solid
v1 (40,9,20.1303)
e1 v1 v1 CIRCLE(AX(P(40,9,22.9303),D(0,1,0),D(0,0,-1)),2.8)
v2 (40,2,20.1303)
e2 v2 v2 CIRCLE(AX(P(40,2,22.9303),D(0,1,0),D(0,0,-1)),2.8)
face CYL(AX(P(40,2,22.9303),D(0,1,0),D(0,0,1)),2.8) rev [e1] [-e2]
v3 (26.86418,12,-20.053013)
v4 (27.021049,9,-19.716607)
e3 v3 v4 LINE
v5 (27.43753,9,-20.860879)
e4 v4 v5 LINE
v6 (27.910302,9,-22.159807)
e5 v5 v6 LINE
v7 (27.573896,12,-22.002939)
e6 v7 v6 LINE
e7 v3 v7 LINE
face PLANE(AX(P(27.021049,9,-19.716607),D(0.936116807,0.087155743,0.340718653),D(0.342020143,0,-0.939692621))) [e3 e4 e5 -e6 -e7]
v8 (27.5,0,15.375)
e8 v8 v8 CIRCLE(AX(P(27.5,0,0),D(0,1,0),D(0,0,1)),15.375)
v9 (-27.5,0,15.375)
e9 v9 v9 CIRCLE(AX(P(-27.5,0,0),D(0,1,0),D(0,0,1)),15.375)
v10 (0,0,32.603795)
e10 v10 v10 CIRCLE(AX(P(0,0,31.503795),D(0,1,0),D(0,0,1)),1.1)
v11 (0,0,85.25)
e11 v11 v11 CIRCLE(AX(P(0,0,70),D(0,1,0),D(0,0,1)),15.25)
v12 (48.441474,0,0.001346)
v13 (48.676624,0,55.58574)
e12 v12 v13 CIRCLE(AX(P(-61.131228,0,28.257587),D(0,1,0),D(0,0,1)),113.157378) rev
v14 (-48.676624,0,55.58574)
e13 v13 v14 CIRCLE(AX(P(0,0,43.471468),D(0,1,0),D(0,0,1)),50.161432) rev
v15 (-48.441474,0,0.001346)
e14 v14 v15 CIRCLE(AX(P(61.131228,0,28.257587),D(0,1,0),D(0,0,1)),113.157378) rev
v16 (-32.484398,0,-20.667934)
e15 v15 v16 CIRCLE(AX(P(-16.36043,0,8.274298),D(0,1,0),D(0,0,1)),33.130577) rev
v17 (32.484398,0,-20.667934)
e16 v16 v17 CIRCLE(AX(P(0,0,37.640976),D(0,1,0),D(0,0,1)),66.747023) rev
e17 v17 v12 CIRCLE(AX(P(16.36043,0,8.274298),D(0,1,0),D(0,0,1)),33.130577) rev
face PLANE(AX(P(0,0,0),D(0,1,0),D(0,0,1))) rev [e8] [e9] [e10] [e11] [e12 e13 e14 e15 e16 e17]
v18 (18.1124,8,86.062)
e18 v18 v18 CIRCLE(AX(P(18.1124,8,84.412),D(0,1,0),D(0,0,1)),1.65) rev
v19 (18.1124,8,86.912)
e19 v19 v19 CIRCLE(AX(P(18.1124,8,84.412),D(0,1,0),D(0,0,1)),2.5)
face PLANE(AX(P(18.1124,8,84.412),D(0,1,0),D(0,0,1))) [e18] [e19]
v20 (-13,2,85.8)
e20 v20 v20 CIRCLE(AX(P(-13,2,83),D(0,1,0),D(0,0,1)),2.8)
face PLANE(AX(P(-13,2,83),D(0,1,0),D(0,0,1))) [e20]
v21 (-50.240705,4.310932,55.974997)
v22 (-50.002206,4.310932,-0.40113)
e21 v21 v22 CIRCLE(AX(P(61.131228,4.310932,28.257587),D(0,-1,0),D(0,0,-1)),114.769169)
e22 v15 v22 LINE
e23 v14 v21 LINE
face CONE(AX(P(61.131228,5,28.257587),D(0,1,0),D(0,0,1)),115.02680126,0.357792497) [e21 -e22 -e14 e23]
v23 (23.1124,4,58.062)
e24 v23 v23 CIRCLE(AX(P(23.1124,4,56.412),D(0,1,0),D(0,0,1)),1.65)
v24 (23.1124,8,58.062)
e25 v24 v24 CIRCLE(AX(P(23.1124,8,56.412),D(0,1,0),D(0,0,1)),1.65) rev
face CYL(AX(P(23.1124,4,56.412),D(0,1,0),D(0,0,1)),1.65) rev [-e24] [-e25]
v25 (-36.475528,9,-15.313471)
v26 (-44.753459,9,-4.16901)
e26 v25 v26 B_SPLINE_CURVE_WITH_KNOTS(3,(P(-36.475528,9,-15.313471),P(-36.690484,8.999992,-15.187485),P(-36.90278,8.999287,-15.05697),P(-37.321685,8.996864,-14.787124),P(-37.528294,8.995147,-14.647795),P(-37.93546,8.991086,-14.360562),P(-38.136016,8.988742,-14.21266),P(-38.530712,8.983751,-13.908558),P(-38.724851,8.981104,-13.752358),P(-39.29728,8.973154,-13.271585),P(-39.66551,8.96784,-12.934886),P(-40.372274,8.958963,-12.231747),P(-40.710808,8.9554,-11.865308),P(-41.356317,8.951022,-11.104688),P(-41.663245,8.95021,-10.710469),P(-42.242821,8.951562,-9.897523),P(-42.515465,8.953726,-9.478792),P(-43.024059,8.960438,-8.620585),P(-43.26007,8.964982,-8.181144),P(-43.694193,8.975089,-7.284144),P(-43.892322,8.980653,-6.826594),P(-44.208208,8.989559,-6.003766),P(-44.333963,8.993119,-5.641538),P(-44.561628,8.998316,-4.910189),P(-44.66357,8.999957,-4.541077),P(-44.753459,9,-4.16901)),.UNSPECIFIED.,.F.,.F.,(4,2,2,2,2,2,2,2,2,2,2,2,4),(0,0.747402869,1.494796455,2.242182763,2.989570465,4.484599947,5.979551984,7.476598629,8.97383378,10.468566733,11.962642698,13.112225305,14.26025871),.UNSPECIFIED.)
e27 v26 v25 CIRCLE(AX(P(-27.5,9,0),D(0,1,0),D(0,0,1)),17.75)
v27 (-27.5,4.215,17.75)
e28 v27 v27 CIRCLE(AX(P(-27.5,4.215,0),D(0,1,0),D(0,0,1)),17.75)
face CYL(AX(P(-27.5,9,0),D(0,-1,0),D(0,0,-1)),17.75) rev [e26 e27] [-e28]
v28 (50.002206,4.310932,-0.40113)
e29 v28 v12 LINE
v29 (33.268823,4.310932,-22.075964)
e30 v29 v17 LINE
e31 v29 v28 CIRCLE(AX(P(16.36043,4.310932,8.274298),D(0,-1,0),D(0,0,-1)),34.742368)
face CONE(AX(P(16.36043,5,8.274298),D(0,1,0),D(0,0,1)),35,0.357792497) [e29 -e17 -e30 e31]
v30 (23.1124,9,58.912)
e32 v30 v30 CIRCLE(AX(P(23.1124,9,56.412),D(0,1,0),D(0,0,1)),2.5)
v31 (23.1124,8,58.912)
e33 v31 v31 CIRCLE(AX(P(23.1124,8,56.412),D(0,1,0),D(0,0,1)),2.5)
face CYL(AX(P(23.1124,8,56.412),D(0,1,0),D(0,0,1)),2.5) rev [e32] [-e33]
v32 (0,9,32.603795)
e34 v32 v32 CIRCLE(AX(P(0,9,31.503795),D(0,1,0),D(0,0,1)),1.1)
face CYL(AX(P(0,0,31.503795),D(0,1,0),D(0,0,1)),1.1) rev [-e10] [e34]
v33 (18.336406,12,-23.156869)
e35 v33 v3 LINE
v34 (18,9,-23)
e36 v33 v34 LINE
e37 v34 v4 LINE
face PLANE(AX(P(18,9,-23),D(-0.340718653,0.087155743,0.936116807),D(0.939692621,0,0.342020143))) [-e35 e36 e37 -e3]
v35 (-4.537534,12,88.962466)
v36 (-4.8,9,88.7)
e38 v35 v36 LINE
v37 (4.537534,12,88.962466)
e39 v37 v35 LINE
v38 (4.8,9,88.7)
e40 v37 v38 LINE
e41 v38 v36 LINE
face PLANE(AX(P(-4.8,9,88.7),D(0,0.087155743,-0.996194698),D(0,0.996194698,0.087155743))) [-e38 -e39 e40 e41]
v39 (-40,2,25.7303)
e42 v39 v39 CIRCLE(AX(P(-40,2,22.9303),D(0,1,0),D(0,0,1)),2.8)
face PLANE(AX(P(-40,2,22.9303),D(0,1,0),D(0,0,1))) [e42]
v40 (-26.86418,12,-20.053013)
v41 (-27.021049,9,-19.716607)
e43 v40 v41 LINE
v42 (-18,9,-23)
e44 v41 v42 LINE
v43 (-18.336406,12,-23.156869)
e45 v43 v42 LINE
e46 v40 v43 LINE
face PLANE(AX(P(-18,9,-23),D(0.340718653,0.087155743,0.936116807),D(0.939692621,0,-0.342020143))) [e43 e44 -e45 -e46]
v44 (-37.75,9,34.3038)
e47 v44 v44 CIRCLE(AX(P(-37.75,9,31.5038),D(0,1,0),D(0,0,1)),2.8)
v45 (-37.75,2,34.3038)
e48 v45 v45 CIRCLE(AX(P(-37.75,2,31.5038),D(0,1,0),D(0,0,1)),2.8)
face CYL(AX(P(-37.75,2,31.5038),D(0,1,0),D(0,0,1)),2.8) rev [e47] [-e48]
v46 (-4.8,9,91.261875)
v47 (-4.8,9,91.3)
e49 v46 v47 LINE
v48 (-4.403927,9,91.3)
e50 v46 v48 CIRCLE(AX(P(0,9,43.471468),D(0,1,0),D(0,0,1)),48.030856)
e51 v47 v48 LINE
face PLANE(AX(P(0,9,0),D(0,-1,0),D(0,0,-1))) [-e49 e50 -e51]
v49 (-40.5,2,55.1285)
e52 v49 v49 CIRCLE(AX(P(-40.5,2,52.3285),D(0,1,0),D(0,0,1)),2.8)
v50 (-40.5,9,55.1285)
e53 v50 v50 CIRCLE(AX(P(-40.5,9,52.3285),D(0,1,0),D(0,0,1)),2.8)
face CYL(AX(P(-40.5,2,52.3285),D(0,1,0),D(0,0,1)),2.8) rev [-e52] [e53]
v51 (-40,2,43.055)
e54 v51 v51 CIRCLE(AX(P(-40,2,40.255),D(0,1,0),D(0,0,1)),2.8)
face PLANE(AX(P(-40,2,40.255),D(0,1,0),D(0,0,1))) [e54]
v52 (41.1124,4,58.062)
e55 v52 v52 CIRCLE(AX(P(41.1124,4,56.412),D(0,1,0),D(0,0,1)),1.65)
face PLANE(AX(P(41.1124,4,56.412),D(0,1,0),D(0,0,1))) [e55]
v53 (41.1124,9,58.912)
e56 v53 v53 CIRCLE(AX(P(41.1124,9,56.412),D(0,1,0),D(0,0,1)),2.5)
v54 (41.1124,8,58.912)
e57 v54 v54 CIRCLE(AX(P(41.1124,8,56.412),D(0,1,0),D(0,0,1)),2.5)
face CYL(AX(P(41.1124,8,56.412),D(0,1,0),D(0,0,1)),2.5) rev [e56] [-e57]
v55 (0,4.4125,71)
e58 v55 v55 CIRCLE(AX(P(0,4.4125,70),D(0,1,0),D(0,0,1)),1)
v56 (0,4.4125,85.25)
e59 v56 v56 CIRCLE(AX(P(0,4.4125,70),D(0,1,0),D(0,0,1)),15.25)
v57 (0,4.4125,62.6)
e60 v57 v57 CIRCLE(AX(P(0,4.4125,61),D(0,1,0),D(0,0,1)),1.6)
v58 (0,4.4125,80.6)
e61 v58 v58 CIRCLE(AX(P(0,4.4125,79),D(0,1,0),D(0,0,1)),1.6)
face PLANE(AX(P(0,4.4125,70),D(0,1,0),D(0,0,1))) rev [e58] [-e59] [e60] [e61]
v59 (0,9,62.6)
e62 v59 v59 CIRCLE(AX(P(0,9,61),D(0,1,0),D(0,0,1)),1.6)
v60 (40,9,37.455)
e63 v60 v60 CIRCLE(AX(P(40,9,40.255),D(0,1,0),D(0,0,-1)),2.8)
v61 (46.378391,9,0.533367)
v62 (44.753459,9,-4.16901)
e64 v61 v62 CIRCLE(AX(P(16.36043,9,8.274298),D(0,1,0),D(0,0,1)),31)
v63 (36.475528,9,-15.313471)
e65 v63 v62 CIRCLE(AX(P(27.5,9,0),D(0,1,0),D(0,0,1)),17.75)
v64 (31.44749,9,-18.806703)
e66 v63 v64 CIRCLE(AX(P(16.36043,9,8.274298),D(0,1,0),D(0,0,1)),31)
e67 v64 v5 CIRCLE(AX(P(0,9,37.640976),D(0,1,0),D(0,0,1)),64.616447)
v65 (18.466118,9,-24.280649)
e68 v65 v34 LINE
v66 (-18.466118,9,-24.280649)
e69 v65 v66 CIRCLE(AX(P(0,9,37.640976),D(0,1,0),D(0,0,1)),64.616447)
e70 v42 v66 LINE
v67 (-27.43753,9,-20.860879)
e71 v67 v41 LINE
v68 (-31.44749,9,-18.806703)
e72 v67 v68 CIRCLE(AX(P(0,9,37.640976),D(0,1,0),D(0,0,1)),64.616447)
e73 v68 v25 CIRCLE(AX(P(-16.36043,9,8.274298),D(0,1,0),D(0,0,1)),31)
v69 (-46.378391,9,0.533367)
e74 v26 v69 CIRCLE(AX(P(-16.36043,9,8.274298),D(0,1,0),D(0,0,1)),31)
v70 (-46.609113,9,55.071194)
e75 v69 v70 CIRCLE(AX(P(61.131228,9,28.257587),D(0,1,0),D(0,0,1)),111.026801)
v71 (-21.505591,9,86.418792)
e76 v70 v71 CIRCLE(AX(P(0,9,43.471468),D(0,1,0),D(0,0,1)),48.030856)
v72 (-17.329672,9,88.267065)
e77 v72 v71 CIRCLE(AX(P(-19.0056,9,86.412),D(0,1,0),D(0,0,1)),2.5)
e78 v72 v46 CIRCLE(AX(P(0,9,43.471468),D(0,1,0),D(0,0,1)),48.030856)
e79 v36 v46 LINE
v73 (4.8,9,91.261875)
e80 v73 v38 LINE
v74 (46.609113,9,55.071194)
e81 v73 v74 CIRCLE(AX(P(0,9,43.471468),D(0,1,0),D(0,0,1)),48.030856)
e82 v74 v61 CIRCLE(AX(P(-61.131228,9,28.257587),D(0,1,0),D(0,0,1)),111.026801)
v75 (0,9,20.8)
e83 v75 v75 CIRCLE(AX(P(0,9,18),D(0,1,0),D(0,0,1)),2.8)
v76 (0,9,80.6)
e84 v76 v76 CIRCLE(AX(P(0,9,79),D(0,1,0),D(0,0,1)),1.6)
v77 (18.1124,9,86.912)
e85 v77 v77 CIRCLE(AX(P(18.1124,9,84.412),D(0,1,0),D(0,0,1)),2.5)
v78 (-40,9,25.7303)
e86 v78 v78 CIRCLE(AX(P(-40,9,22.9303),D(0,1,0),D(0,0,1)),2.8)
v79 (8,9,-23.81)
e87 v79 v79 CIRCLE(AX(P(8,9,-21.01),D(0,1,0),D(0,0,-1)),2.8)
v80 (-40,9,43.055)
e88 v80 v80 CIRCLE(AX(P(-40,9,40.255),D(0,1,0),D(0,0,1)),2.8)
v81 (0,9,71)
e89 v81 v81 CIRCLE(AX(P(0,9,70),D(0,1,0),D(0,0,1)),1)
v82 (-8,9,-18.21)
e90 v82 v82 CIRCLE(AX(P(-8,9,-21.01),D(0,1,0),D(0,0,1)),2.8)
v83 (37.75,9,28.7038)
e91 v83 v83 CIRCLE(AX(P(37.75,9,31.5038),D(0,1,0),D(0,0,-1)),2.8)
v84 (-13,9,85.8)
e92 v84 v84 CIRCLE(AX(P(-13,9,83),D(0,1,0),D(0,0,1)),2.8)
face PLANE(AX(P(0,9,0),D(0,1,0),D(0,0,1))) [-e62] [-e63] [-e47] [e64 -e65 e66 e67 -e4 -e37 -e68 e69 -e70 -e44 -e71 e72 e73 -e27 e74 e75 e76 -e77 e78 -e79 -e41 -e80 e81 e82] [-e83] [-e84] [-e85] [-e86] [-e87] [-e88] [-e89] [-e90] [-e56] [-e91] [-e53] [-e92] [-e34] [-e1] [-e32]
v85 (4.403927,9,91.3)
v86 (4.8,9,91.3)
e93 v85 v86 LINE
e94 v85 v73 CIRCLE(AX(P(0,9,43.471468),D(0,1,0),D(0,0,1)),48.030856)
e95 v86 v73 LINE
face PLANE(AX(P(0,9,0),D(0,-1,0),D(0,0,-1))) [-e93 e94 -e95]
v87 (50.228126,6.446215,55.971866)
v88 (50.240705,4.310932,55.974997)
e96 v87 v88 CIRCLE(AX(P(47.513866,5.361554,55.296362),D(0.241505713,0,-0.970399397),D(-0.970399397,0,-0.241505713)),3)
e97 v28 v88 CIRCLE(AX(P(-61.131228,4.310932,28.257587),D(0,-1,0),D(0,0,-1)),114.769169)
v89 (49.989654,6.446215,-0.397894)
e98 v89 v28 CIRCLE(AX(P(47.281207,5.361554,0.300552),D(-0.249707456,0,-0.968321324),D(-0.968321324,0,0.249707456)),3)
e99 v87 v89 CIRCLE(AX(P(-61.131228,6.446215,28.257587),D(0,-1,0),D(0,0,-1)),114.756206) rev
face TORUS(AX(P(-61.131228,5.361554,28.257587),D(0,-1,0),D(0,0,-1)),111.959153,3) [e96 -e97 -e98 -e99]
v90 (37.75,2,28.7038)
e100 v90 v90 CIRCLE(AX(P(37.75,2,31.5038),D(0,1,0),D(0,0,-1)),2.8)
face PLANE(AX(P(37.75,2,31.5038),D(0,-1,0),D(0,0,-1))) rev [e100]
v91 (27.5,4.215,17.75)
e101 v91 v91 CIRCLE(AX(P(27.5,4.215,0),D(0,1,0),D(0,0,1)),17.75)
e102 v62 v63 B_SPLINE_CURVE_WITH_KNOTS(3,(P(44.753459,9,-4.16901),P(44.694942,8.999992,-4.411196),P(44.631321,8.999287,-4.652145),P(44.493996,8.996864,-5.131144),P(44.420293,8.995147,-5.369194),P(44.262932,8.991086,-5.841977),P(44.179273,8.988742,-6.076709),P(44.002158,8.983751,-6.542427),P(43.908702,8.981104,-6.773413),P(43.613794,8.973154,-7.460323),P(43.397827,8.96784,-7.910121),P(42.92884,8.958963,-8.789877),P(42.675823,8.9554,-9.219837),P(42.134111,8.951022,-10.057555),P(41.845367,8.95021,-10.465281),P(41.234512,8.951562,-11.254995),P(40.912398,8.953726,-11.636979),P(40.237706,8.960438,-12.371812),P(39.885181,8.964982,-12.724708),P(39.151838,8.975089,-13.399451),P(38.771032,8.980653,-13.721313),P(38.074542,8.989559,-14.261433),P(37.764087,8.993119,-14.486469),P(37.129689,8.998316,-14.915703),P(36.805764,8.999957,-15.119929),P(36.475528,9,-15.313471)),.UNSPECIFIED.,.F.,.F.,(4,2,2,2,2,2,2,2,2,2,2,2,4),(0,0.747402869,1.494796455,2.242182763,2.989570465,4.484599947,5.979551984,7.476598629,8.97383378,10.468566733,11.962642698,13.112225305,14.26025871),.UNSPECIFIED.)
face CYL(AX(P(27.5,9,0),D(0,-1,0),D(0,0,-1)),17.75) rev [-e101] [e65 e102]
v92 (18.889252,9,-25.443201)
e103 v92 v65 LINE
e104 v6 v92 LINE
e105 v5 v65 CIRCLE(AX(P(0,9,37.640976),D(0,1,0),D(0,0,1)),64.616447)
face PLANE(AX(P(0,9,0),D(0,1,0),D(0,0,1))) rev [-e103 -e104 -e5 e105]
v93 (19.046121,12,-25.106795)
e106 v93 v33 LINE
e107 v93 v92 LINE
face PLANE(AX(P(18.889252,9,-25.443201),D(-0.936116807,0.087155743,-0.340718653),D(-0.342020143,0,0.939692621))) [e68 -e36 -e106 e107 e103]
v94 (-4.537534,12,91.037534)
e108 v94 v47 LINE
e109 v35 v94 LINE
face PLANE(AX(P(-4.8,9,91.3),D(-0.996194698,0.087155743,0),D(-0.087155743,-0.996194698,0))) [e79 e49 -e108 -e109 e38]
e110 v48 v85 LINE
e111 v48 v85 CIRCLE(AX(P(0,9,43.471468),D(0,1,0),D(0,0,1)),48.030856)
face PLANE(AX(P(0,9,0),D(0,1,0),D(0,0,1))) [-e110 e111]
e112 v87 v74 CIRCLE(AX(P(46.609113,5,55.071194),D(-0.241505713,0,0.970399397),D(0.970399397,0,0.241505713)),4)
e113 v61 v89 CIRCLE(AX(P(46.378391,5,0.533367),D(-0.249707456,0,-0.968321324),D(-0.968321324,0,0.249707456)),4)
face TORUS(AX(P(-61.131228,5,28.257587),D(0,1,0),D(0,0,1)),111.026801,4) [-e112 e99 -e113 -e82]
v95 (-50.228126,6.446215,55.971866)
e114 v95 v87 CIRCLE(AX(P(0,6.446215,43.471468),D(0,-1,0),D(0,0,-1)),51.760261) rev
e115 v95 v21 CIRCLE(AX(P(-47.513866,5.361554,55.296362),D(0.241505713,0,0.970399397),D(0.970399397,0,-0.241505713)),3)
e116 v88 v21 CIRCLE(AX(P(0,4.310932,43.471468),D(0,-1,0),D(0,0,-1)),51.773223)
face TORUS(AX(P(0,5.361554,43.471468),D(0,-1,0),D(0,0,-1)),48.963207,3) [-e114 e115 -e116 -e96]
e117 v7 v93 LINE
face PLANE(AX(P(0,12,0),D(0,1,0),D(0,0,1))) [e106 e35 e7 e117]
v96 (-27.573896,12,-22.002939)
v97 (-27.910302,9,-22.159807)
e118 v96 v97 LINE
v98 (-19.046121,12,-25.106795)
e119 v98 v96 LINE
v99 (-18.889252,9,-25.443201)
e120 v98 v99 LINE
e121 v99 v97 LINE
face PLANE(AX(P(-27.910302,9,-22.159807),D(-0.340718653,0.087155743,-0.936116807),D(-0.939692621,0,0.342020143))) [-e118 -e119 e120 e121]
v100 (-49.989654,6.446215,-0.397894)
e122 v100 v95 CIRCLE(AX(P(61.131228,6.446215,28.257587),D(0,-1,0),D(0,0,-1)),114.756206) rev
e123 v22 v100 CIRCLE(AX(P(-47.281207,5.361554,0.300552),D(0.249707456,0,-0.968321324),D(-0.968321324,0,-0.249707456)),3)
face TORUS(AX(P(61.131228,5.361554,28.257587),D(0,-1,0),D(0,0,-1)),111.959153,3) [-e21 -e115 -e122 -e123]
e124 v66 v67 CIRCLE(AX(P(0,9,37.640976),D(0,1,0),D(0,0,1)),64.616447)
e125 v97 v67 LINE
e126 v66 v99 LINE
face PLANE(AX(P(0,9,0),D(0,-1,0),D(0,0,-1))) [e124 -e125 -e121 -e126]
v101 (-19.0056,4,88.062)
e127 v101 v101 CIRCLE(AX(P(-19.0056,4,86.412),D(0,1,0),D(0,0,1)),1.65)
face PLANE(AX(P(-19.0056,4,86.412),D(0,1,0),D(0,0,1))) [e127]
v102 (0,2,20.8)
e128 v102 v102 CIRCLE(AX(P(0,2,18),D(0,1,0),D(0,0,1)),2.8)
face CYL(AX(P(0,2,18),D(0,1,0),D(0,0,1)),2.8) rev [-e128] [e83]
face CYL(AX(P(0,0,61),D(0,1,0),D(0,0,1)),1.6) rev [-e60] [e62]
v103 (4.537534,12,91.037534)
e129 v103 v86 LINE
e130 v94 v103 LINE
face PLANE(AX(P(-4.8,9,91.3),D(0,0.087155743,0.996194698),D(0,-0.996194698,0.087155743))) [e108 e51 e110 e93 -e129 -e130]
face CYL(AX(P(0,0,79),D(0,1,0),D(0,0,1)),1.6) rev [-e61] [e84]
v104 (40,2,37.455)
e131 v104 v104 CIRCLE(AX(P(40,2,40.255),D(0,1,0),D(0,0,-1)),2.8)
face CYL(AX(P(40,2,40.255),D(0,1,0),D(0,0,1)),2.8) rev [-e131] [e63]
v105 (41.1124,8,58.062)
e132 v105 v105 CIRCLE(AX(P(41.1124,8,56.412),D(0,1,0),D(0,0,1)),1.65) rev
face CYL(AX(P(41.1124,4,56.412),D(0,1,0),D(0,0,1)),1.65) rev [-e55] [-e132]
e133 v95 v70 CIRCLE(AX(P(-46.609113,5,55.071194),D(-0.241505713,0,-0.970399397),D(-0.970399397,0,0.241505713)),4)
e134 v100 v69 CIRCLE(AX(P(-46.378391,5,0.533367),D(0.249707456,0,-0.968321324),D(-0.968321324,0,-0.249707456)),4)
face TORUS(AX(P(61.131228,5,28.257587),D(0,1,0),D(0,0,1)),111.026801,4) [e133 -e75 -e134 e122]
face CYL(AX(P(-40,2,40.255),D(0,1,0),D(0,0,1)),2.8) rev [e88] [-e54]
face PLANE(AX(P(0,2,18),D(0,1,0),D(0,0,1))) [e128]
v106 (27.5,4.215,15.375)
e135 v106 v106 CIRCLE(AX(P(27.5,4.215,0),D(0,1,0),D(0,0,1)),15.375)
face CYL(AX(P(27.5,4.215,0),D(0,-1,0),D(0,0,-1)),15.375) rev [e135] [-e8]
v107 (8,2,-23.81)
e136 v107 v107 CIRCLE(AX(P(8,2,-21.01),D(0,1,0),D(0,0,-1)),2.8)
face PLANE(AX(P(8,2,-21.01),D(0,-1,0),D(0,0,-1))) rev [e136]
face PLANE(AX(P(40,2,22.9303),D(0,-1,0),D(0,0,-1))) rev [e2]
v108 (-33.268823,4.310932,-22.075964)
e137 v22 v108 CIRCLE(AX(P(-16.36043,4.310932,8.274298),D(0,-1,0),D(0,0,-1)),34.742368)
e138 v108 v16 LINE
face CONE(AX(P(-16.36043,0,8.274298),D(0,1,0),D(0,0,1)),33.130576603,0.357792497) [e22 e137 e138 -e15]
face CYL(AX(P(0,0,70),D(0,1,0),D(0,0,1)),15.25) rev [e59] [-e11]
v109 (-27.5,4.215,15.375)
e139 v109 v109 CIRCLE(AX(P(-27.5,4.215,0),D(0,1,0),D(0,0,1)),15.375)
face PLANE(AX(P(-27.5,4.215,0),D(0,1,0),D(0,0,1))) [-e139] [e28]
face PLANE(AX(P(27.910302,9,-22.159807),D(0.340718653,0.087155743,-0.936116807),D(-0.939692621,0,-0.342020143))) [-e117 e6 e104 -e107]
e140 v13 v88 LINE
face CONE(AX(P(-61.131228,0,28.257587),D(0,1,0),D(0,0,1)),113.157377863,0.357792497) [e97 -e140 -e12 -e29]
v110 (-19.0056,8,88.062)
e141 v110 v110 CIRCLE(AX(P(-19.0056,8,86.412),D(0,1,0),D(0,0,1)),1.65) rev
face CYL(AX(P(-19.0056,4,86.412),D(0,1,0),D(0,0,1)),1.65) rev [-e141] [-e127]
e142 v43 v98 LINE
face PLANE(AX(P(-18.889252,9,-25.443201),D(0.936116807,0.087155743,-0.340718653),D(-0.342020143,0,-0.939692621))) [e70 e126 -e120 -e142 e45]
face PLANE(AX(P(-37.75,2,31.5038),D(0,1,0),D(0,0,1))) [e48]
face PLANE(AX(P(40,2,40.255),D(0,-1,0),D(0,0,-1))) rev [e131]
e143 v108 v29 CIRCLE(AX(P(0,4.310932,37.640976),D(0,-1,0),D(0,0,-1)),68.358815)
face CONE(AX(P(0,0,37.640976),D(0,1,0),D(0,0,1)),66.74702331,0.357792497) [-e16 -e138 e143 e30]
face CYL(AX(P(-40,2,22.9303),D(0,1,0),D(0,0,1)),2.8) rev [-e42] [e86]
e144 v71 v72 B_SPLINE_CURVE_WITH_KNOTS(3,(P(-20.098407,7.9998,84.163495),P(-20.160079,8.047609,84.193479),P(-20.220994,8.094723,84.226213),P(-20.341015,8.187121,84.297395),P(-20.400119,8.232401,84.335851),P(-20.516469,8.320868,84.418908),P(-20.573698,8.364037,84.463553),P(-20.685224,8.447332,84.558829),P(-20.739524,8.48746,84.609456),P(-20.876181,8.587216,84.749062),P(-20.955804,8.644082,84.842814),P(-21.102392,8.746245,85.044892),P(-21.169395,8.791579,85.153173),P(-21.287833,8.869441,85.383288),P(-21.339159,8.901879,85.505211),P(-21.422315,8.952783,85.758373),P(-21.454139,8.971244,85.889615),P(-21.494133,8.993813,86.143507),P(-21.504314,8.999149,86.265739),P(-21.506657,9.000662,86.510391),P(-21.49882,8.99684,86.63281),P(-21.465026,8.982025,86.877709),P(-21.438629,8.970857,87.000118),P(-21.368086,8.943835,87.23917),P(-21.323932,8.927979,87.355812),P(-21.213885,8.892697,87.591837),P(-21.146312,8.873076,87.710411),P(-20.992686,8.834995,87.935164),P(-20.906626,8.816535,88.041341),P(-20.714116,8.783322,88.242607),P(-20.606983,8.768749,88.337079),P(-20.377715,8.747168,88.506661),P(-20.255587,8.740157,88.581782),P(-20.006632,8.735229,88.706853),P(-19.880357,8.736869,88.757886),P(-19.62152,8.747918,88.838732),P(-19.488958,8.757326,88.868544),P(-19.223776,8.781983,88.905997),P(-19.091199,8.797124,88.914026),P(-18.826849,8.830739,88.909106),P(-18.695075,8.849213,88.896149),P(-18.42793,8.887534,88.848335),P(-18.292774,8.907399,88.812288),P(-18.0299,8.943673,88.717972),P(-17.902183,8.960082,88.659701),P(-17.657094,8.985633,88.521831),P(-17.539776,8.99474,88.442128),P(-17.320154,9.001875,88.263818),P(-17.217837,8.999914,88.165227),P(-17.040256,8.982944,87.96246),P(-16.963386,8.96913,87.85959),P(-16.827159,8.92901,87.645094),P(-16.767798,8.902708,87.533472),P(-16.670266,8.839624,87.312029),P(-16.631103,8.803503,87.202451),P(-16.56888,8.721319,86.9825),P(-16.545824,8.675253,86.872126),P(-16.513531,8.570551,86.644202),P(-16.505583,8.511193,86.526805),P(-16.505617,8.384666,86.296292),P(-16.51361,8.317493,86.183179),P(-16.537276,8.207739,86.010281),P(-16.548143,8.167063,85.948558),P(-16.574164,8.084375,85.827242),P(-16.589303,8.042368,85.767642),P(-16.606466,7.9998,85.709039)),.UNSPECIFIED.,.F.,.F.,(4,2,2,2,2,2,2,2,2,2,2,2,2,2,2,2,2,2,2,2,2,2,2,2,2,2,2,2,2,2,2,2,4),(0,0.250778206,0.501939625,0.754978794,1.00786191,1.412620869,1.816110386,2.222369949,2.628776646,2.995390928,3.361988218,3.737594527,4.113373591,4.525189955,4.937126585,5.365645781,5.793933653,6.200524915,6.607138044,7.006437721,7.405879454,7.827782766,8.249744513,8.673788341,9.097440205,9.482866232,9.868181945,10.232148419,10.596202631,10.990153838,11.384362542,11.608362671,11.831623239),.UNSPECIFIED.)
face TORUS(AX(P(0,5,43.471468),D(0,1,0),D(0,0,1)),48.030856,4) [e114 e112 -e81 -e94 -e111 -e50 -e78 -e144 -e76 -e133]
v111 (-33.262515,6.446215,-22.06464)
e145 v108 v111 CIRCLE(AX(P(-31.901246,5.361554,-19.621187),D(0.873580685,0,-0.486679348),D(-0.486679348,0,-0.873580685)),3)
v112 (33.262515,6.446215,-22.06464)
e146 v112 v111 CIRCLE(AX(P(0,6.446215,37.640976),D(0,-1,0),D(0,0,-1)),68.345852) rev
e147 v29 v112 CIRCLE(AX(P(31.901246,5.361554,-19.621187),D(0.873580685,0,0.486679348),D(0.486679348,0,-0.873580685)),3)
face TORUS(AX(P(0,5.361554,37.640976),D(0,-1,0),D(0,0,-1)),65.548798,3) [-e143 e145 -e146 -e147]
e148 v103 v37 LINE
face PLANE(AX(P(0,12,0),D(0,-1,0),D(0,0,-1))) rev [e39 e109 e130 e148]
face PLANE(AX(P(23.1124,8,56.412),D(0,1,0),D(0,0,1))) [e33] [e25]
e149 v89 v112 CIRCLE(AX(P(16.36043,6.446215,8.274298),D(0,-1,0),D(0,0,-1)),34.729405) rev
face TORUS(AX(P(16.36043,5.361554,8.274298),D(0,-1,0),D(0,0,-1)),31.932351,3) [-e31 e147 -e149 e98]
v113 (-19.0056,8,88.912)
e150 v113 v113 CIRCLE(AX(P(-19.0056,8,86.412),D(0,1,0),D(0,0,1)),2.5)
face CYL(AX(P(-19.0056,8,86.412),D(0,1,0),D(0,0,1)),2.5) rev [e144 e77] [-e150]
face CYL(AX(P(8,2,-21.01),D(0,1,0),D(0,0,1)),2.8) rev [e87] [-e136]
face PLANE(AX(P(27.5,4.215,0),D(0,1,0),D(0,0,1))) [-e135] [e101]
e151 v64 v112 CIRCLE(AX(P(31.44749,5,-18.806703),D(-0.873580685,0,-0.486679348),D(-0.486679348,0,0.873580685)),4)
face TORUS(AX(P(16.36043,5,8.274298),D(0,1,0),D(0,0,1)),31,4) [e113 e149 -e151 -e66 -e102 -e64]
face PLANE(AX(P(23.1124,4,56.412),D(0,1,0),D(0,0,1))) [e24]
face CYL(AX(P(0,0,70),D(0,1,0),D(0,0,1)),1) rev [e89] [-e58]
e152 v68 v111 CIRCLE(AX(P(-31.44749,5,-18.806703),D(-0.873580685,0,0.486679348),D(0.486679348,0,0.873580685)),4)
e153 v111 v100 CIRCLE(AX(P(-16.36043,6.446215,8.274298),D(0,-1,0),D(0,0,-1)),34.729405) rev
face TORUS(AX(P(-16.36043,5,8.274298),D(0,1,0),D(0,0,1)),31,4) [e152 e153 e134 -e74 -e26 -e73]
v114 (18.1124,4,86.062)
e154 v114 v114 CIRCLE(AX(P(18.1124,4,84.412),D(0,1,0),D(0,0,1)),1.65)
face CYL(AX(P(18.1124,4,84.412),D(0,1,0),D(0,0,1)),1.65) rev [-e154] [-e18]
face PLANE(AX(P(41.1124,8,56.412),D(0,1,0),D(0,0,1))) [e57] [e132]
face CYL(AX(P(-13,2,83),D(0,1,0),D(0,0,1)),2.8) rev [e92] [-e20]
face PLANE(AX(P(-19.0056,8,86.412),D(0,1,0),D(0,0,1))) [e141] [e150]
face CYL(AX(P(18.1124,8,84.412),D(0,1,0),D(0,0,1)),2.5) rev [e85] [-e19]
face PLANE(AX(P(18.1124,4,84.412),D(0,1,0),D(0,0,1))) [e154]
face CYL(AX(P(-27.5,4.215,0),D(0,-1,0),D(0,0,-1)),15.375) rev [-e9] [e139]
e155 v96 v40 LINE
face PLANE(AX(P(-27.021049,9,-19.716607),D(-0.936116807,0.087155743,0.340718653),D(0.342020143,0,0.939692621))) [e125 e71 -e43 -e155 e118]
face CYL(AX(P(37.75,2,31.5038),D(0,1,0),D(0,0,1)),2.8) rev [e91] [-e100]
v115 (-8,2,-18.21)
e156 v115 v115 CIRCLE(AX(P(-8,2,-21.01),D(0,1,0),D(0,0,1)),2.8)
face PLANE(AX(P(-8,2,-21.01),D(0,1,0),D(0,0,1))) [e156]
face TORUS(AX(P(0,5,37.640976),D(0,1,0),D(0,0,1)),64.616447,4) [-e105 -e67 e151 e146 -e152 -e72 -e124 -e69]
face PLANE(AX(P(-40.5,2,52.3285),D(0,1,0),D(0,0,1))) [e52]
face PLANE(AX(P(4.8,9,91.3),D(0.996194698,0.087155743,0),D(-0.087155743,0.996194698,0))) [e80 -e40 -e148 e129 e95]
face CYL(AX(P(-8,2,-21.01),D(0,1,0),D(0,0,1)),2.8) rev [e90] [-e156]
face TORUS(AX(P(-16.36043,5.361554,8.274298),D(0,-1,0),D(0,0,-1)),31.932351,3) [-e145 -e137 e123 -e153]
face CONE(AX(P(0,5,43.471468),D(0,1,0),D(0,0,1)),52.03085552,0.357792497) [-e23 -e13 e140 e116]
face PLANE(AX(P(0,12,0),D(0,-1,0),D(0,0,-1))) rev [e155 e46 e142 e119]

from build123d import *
from OCP.BRepFilletAPI import BRepFilletAPI_MakeChamfer

# Parameters (mm, degrees)
SKETCH1_R                     = 20
SKETCH1_R_2                   = 17.75
BOSS_EXTRUDE1_DEPTH           = 9
SKETCH2_R                     = 17.75
SKETCH2_R_2                   = 15.375
BOSS_EXTRUDE3_DEPTH           = 4.215
SKETCH4_R                     = 2.8
M3_TAPPING_INSERT_HOLES_DEPTH = 7
EXTRUDE_THIN2_START           = -9
EXTRUDE_THIN2_DEPTH           = 9
THUMB_KNUCKLE_HOLE_START      = -4.5875
SKETCH7_R                     = 15.25
THUMB_KNUCKLE_HOLE_DEPTH      = 106.441707798
SKETCH8_R                     = 1
SKETCH8_R_2                   = 1.6
THUMB_THROUGH_HOLE_S_DEPTH    = 111.029207798
SKETCH9_R                     = 1.1
CENTER_SCREW_THROUGH_DEPTH    = 111.029207798
CHAMFER1_SIZE                 = 5
CHAMFER1_SIZE2                = 1.869423397
FILLET1_R                     = 4
FILLET2_R                     = 3
CHAMFER_FITS_DEPTH            = 3
CHAMFER_FITS_DRAFT            = 5
SKETCH10_W                    = 9.6
SKETCH10_H                    = 2.6
CHAMFER_FITS_PROFILE_2_DEPTH  = 3
CHAMFER_FITS_PROFILE_2_DRAFT  = 5
CHAMFER_FITS_PROFILE_3_DEPTH  = 3
CHAMFER_FITS_PROFILE_3_DRAFT  = 5
SKETCH11_R                    = 1.65
M2_PRESS_INSERT_HOLES_DEPTH   = 5
SKETCH12_R                    = 2.5
M2_PRESS_INSERT_HEAD_DEPTH    = 1


with BuildPart() as part:
    # Sketch1 → Boss-Extrude1 (new body)
    # profile 1 of 3: a face of its own
    with BuildSketch(Plane(origin=(0, 0, 0), x_dir=(1, 0, 0), z_dir=(0, 1, 0))):
        with BuildLine():
            ThreePointArc((46.554987721, 6.075149623), (47.262334812, 3.074105201), (47.5, 0))
            ThreePointArc((47.5, 0), (9.667891023, -9.056262443), (39.298411056, 16.149225881))
            ThreePointArc((39.298411056, 16.149225881), (0, 28.975470321), (-39.298411056, 16.149225881))
            ThreePointArc((-39.298411056, 16.149225881), (-18.443737557, 17.832108977), (-7.5, 0))
            ThreePointArc((-7.5, 0), (-30.574105201, -19.762334812), (-46.554987721, 6.075149623))
            ThreePointArc((-46.554987721, 6.075149623), (-51.83640533, -24.60085732), (-48.549912051, -55.554205053))
            ThreePointArc((-48.549912051, -55.554205053), (0, -93.502323139), (48.549912051, -55.554205053))
            ThreePointArc((48.549912051, -55.554205053), (51.83640533, -24.60085732), (46.554987721, 6.075149623))
        make_face()
    # profile 2 of 3: a face of its own
    with BuildSketch(Plane(origin=(0, 0, 0), x_dir=(1, 0, 0), z_dir=(0, 1, 0))):
        with Locations((-27.5, 0)):
            Circle(SKETCH1_R)
        with Locations(Location((-27.5, 0, 0), (0, 0, 270))):
            Circle(SKETCH1_R_2, mode=Mode.SUBTRACT)
    # profile 3 of 3: a face of its own
    with BuildSketch(Plane(origin=(0, 0, 0), x_dir=(1, 0, 0), z_dir=(0, 1, 0))):
        with Locations((27.5, 0)):
            Circle(SKETCH1_R)
        with Locations(Location((27.5, 0, 0), (0, 0, 270))):
            Circle(SKETCH1_R_2, mode=Mode.SUBTRACT)
    extrude(amount=BOSS_EXTRUDE1_DEPTH)

    # Sketch2 → Boss-Extrude3 (add)
    # profile 1 of 2: a face of its own
    with BuildSketch(Plane(origin=(0, 0, 0), x_dir=(1, 0, 0), z_dir=(0, 1, 0))):
        with Locations(Location((-27.5, 0, 0), (0, 0, 270))):
            Circle(SKETCH2_R)
        with Locations(Location((-27.5, 0, 0), (0, 0, 270))):
            Circle(SKETCH2_R_2, mode=Mode.SUBTRACT)
    # profile 2 of 2: a face of its own
    with BuildSketch(Plane(origin=(0, 0, 0), x_dir=(1, 0, 0), z_dir=(0, 1, 0))):
        with Locations(Location((27.5, 0, 0), (0, 0, 270))):
            Circle(SKETCH2_R)
        with Locations(Location((27.5, 0, 0), (0, 0, 270))):
            Circle(SKETCH2_R_2, mode=Mode.SUBTRACT)
    extrude(amount=BOSS_EXTRUDE3_DEPTH)

    # Sketch4 → M3_Tapping_Insert_Holes (cut)
    with BuildSketch(Plane(origin=(0, 9, 0), x_dir=(1, 0, 0), z_dir=(0, 1, 0))):
        with Locations(Location((-8, 21.01, 0), (0, 0, 270))):
            Circle(SKETCH4_R)
        with Locations(Location((0, -18, 0), (0, 0, 270))):
            Circle(SKETCH4_R)
        with Locations(Location((-40, -22.9303, 0), (0, 0, 270))):
            Circle(SKETCH4_R)
        with Locations(Location((-37.75, -31.5038, 0), (0, 0, 270))):
            Circle(SKETCH4_R)
        with Locations(Location((-40, -40.255, 0), (0, 0, 270))):
            Circle(SKETCH4_R)
        with Locations(Location((-40.5, -52.3285, 0), (0, 0, 270))):
            Circle(SKETCH4_R)
        with Locations(Location((-13, -83, 0), (0, 0, 270))):
            Circle(SKETCH4_R)
        with Locations(Location((40, -40.255, 0), (0, 0, 90))):
            Circle(SKETCH4_R)
        with Locations(Location((37.75, -31.5038, 0), (0, 0, 90))):
            Circle(SKETCH4_R)
        with Locations(Location((40, -22.9303, 0), (0, 0, 90))):
            Circle(SKETCH4_R)
        with Locations(Location((8, 21.01, 0), (0, 0, 90))):
            Circle(SKETCH4_R)
    extrude(amount=-M3_TAPPING_INSERT_HOLES_DEPTH, mode=Mode.SUBTRACT)

    # Sketch5 → Extrude-Thin2 (add)
    with BuildSketch(Plane(origin=(0, 9, 0), x_dir=(1, 0, 0), z_dir=(0, 1, 0)).offset(EXTRUDE_THIN2_START)):
        with BuildLine():
            ThreePointArc((-50.490710842, -56.037216511), (-53.894544169, -27.770971196), (-50.251676697, 0.465463106))
            ThreePointArc((-50.251676697, 0.465463106), (-44.064896745, 13.114076138), (-33.394207534, 22.301026099))
            ThreePointArc((-33.394207534, 22.301026099), (0, 30.975470321), (33.394207534, 22.301026099))
            ThreePointArc((33.394207534, 22.301026099), (44.064896745, 13.114076138), (50.251676697, 0.465463106))
            ThreePointArc((50.251676697, 0.465463106), (53.894544169, -27.770971196), (50.490710842, -56.037216511))
            ThreePointArc((50.490710842, -56.037216511), (0, -95.502323157), (-50.490710842, -56.037216511))
        make_face()
        with BuildLine():
            ThreePointArc((-48.549912048, -55.554205085), (-51.894562065, -27.779432105), (-48.315034049, -0.033951806))
            ThreePointArc((-48.315034049, -0.033951806), (-42.481784381, 11.891883339), (-32.420848839, 20.55386473))
            ThreePointArc((-32.420848839, 20.55386473), (0, 28.975470321), (32.420848839, 20.55386473))
            ThreePointArc((32.420848839, 20.55386473), (42.481784381, 11.891883339), (48.315034049, -0.033951806))
            ThreePointArc((48.315034049, -0.033951806), (51.894562065, -27.779432105), (48.549912048, -55.554205085))
            ThreePointArc((48.549912048, -55.554205085), (0, -93.502323157), (-48.549912048, -55.554205085))
        make_face(mode=Mode.SUBTRACT)
    extrude(amount=EXTRUDE_THIN2_DEPTH)

    # Sketch7 → Thumb_Knuckle_Hole (cut, through all)
    with BuildSketch(Plane(origin=(0, 9, 0), x_dir=(1, 0, 0), z_dir=(0, 1, 0)).offset(THUMB_KNUCKLE_HOLE_START)):
        with Locations(Location((0, -70, 0), (0, 0, 270))):
            Circle(SKETCH7_R)
    extrude(amount=-THUMB_KNUCKLE_HOLE_DEPTH, mode=Mode.SUBTRACT)

    # Sketch8 → Thumb_Through_Hole(s) (cut, through all)
    with BuildSketch(Plane(origin=(0, 9, 0), x_dir=(1, 0, 0), z_dir=(0, 1, 0))):
        with Locations(Location((0, -70, 0), (0, 0, 270))):
            Circle(SKETCH8_R)
        with Locations(Location((0, -61, 0), (0, 0, 270))):
            Circle(SKETCH8_R_2)
        with Locations(Location((0, -79, 0), (0, 0, 270))):
            Circle(SKETCH8_R_2)
    extrude(amount=-THUMB_THROUGH_HOLE_S_DEPTH, mode=Mode.SUBTRACT)

    # Sketch9 → Center_Screw_Through (cut, through all)
    with BuildSketch(Plane(origin=(0, 9, 0), x_dir=(1, 0, 0), z_dir=(0, 1, 0))):
        with Locations(Location((0, -31.5037951, 0), (0, 0, 270))):
            Circle(SKETCH9_R)
    extrude(amount=-CENTER_SCREW_THROUGH_DEPTH, mode=Mode.SUBTRACT)

    # Chamfer1: one chamfer whose edges measure the first distance from different faces: ONE call of the kernel's chamfer builder (chamfer() names one face for all edges)
    chamfer1_edges_1 = [part.edges().sort_by_distance(p)[0] for p in [
        (53.894544169, 0, 27.770971196),
    ]]
    chamfer1_side_1 = [part.faces().sort_by_distance(p)[0] for p in [
        (53.894544169, 4.5, 27.770971196),
    ]]
    chamfer1_edges_2 = [part.edges().sort_by_distance(p)[0] for p in [
        (-44.064896745, 0, -13.114076138),
    ]]
    chamfer1_side_2 = [part.faces().sort_by_distance(p)[0] for p in [
        (-44.064896745, 4.5, -13.114076138),
    ]]
    chamfer1_edges_3 = [part.edges().sort_by_distance(p)[0] for p in [
        (0, 0, -30.975470321),
    ]]
    chamfer1_side_3 = [part.faces().sort_by_distance(p)[0] for p in [
        (0, 4.5, -30.975470321),
    ]]
    chamfer1_edges_4 = [part.edges().sort_by_distance(p)[0] for p in [
        (44.064896745, 0, -13.114076138),
    ]]
    chamfer1_side_4 = [part.faces().sort_by_distance(p)[0] for p in [
        (44.064896745, 4.5, -13.114076138),
    ]]
    chamfer1_edges_5 = [part.edges().sort_by_distance(p)[0] for p in [
        (0, 0, 95.502323157),
    ]]
    chamfer1_side_5 = [part.faces().sort_by_distance(p)[0] for p in [
        (0, 4.5, 95.502323157),
    ]]
    chamfer1_edges_6 = [part.edges().sort_by_distance(p)[0] for p in [
        (-53.894544169, 0, 27.770971196),
    ]]
    chamfer1_side_6 = [part.faces().sort_by_distance(p)[0] for p in [
        (-53.894544169, 4.5, 27.770971196),
    ]]
    chamfer1 = BRepFilletAPI_MakeChamfer(part.part.solid().wrapped)
    for e in chamfer1_edges_1:
        chamfer1.Add(CHAMFER1_SIZE, CHAMFER1_SIZE2, e.wrapped, chamfer1_side_1[0].wrapped)  # the first distance lies on this face
    for e in chamfer1_edges_2:
        chamfer1.Add(CHAMFER1_SIZE, CHAMFER1_SIZE2, e.wrapped, chamfer1_side_2[0].wrapped)  # the first distance lies on this face
    for e in chamfer1_edges_3:
        chamfer1.Add(CHAMFER1_SIZE, CHAMFER1_SIZE2, e.wrapped, chamfer1_side_3[0].wrapped)  # the first distance lies on this face
    for e in chamfer1_edges_4:
        chamfer1.Add(CHAMFER1_SIZE, CHAMFER1_SIZE2, e.wrapped, chamfer1_side_4[0].wrapped)  # the first distance lies on this face
    for e in chamfer1_edges_5:
        chamfer1.Add(CHAMFER1_SIZE, CHAMFER1_SIZE2, e.wrapped, chamfer1_side_5[0].wrapped)  # the first distance lies on this face
    for e in chamfer1_edges_6:
        chamfer1.Add(CHAMFER1_SIZE, CHAMFER1_SIZE2, e.wrapped, chamfer1_side_6[0].wrapped)  # the first distance lies on this face
    add(Compound.cast(chamfer1.Shape()), mode=Mode.REPLACE)

    # Fillet1
    # the kernel refuses this fillet: 4 mm, written as the material it takes off along each edge
    with BuildSketch(Plane(origin=(-16.36043036, 9, 8.27429786), x_dir=(-0.96832132390781, 0, -0.2497074561670639), z_dir=(-0.2497074561670639, 0, 0.96832132390781))) as fillet1_piece_1:
        with BuildLine():
            CenterArc((35 - FILLET1_R, FILLET1_R), FILLET1_R, 270, 90)
            Line((35 - FILLET1_R, 0), (35, 0))
            Line((35, 0), (35, FILLET1_R))
        make_face()
    revolve(axis=Axis((-16.36043036, 9, 8.27429786), (0, -1, 0)), revolution_arc=46.417240957, mode=Mode.SUBTRACT)
    with BuildSketch(Plane(origin=(0, 9, 37.640976386), x_dir=(-0.48667934783574135, 0, -0.8735806845335911), z_dir=(-0.8735806845335911, 0, 0.48667934783574135))) as fillet1_piece_2:
        with BuildLine():
            CenterArc((68.616446707 - FILLET1_R, FILLET1_R), FILLET1_R, 270, 90)
            Line((68.616446707 - FILLET1_R, 0), (68.616446707, 0))
            Line((68.616446707, 0), (68.616446707, FILLET1_R))
        make_face()
    revolve(axis=Axis((0, 9, 37.640976386), (0, -1, 0)), revolution_arc=58.245114826, mode=Mode.SUBTRACT)
    with BuildSketch(Plane(origin=(16.36043036, 9, 8.27429786), x_dir=(0.4866793478357412, 0, -0.8735806845335913), z_dir=(-0.8735806845335913, 0, -0.4866793478357412))) as fillet1_piece_3:
        with BuildLine():
            CenterArc((35 - FILLET1_R, FILLET1_R), FILLET1_R, 270, 90)
            Line((35 - FILLET1_R, 0), (35, 0))
            Line((35, 0), (35, FILLET1_R))
        make_face()
    revolve(axis=Axis((16.36043036, 9, 8.27429786), (0, -1, 0)), revolution_arc=46.417240957, mode=Mode.SUBTRACT)
    with BuildSketch(Plane(origin=(-61.131227784, 9, 28.257586828), x_dir=(0.968321323907809, 0, -0.24970745616706774), z_dir=(-0.24970745616706774, 0, -0.968321323907809))) as fillet1_piece_4:
        with BuildLine():
            CenterArc((115.02680126 - FILLET1_R, FILLET1_R), FILLET1_R, 270, 90)
            Line((115.02680126 - FILLET1_R, 0), (115.02680126, 0))
            Line((115.02680126, 0), (115.02680126, FILLET1_R))
        make_face()
    revolve(axis=Axis((-61.131227784, 9, 28.257586828), (0, -1, 0)), revolution_arc=28.435627455, mode=Mode.SUBTRACT)
    with BuildSketch(Plane(origin=(0, 9, 43.471467637), x_dir=(0.970399397391295, 0, 0.24150571327115955), z_dir=(0.24150571327115955, 0, -0.970399397391295))) as fillet1_piece_5:
        with BuildLine():
            CenterArc((52.03085552 - FILLET1_R, FILLET1_R), FILLET1_R, 270, 90)
            Line((52.03085552 - FILLET1_R, 0), (52.03085552, 0))
            Line((52.03085552, 0), (52.03085552, FILLET1_R))
        make_face()
    revolve(axis=Axis((0, 9, 43.471467637), (0, -1, 0)), revolution_arc=152.04914835, mode=Mode.SUBTRACT)
    with BuildSketch(Plane(origin=(61.131227784, 9, 28.257586828), x_dir=(-0.9703993973912952, 0, 0.2415057132711584), z_dir=(0.2415057132711584, 0, 0.9703993973912952))) as fillet1_piece_6:
        with BuildLine():
            CenterArc((115.02680126 - FILLET1_R, FILLET1_R), FILLET1_R, 270, 90)
            Line((115.02680126 - FILLET1_R, 0), (115.02680126, 0))
            Line((115.02680126, 0), (115.02680126, FILLET1_R))
        make_face()
    revolve(axis=Axis((61.131227784, 9, 28.257586828), (0, -1, 0)), revolution_arc=28.435627455, mode=Mode.SUBTRACT)

    # Fillet2
    fillet2_edges = [part.edges().sort_by_distance(p)[0] for p in [
        (-44.064896745, 5, -13.114076138),
        (0, 5, -30.975470321),
        (-53.894544169, 5, 27.770971196),
        (44.064896745, 5, -13.114076138),
        (0, 5, 95.502323157),
        (53.894544169, 5, 27.770971196),
    ]]
    fillet(fillet2_edges, radius=FILLET2_R)


with BuildPart() as chamfer_fits_tool:
    # Sketch10 → Chamfer_Fits (with draft: the straight prism first)
    with BuildSketch(Plane(origin=(0, 9, 0), x_dir=(1, 0, 0), z_dir=(0, 1, 0))):
        Polygon((-18.889252373, 25.443200814), (-27.910301532, 22.159807438), (-27.02104916, 19.716606624), (-18, 23), align=None)
    extrude(amount=CHAMFER_FITS_DEPTH)
    # Chamfer_Fits: the draft: its side faces are tilted about the plane it starts from
    chamfer_fits_sides = [chamfer_fits_tool.faces().sort_by_distance(p)[0] for p in [
        (-23.399776952, 10.5, -23.801504126),
        (-27.465675346, 10.5, -20.938207031),
        (-22.51052458, 10.5, -21.358303312),
        (-18.444626186, 10.5, -24.221600407),
    ]]
    draft(chamfer_fits_sides, Plane(origin=(0, 9, 0), x_dir=(1, 0, 0), z_dir=(0, 1, 0)), CHAMFER_FITS_DRAFT)


with BuildPart() as part_1:
    add(part.part)

    # Chamfer_Fits: add chamfer_fits_tool
    add(chamfer_fits_tool.part)


with BuildPart() as chamfer_fits_profile_2_tool:
    # Sketch10 → Chamfer_Fits profile 2 (with draft: the straight prism first)
    with BuildSketch(Plane(origin=(0, 9, 0), x_dir=(1, 0, 0), z_dir=(0, 1, 0))):
        with Locations((0, -90)):
            Rectangle(SKETCH10_W, SKETCH10_H)
    extrude(amount=CHAMFER_FITS_PROFILE_2_DEPTH)
    # Chamfer_Fits profile 2: the draft: its side faces are tilted about the plane it starts from
    chamfer_fits_profile_2_sides = [chamfer_fits_profile_2_tool.faces().sort_by_distance(p)[0] for p in [
        (0, 10.5, 91.3),
        (4.8, 10.5, 90),
        (0, 10.5, 88.7),
        (-4.8, 10.5, 90),
    ]]
    draft(chamfer_fits_profile_2_sides, Plane(origin=(0, 9, 0), x_dir=(1, 0, 0), z_dir=(0, 1, 0)), CHAMFER_FITS_PROFILE_2_DRAFT)


with BuildPart() as part_2:
    add(part_1.part)

    # Chamfer_Fits profile 2: add chamfer_fits_profile_2_tool
    add(chamfer_fits_profile_2_tool.part)


with BuildPart() as chamfer_fits_profile_3_tool:
    # Sketch10 → Chamfer_Fits profile 3 (with draft: the straight prism first)
    with BuildSketch(Plane(origin=(0, 9, 0), x_dir=(1, 0, 0), z_dir=(0, 1, 0))):
        Polygon((18.889252373, 25.443200814), (18, 23), (27.02104916, 19.716606624), (27.910301532, 22.159807438), align=None)
    extrude(amount=CHAMFER_FITS_PROFILE_3_DEPTH)
    # Chamfer_Fits profile 3: the draft: its side faces are tilted about the plane it starts from
    chamfer_fits_profile_3_sides = [chamfer_fits_profile_3_tool.faces().sort_by_distance(p)[0] for p in [
        (18.444626186, 10.5, -24.221600407),
        (22.51052458, 10.5, -21.358303312),
        (27.465675346, 10.5, -20.938207031),
        (23.399776952, 10.5, -23.801504126),
    ]]
    draft(chamfer_fits_profile_3_sides, Plane(origin=(0, 9, 0), x_dir=(1, 0, 0), z_dir=(0, 1, 0)), CHAMFER_FITS_PROFILE_3_DRAFT)


with BuildPart() as part_3:
    add(part_2.part)

    # Chamfer_Fits profile 3: add chamfer_fits_profile_3_tool
    add(chamfer_fits_profile_3_tool.part)

    # Sketch11 → M2_Press_Insert_Holes (cut)
    with BuildSketch(Plane(origin=(0, 9, 0), x_dir=(1, 0, 0), z_dir=(0, 1, 0))):
        with Locations(Location((23.1124, -56.412, 0), (0, 0, 270))):
            Circle(SKETCH11_R)
        with Locations(Location((41.1124, -56.412, 0), (0, 0, 270))):
            Circle(SKETCH11_R)
        with Locations(Location((18.1124, -84.412, 0), (0, 0, 270))):
            Circle(SKETCH11_R)
        with Locations(Location((-19.0056, -86.412, 0), (0, 0, 270))):
            Circle(SKETCH11_R)
    extrude(amount=-M2_PRESS_INSERT_HOLES_DEPTH, mode=Mode.SUBTRACT)

    # Sketch12 → M2_Press_Insert_Head (cut)
    with BuildSketch(Plane(origin=(0, 9, 0), x_dir=(1, 0, 0), z_dir=(0, 1, 0))):
        with Locations(Location((23.1124, -56.412, 0), (0, 0, 270))):
            Circle(SKETCH12_R)
        with Locations(Location((41.1124, -56.412, 0), (0, 0, 270))):
            Circle(SKETCH12_R)
        with Locations(Location((18.1124, -84.412, 0), (0, 0, 270))):
            Circle(SKETCH12_R)
        with Locations(Location((-19.0056, -86.412, 0), (0, 0, 270))):
            Circle(SKETCH12_R)
    extrude(amount=-M2_PRESS_INSERT_HEAD_DEPTH, mode=Mode.SUBTRACT)


solid = part_3.part
